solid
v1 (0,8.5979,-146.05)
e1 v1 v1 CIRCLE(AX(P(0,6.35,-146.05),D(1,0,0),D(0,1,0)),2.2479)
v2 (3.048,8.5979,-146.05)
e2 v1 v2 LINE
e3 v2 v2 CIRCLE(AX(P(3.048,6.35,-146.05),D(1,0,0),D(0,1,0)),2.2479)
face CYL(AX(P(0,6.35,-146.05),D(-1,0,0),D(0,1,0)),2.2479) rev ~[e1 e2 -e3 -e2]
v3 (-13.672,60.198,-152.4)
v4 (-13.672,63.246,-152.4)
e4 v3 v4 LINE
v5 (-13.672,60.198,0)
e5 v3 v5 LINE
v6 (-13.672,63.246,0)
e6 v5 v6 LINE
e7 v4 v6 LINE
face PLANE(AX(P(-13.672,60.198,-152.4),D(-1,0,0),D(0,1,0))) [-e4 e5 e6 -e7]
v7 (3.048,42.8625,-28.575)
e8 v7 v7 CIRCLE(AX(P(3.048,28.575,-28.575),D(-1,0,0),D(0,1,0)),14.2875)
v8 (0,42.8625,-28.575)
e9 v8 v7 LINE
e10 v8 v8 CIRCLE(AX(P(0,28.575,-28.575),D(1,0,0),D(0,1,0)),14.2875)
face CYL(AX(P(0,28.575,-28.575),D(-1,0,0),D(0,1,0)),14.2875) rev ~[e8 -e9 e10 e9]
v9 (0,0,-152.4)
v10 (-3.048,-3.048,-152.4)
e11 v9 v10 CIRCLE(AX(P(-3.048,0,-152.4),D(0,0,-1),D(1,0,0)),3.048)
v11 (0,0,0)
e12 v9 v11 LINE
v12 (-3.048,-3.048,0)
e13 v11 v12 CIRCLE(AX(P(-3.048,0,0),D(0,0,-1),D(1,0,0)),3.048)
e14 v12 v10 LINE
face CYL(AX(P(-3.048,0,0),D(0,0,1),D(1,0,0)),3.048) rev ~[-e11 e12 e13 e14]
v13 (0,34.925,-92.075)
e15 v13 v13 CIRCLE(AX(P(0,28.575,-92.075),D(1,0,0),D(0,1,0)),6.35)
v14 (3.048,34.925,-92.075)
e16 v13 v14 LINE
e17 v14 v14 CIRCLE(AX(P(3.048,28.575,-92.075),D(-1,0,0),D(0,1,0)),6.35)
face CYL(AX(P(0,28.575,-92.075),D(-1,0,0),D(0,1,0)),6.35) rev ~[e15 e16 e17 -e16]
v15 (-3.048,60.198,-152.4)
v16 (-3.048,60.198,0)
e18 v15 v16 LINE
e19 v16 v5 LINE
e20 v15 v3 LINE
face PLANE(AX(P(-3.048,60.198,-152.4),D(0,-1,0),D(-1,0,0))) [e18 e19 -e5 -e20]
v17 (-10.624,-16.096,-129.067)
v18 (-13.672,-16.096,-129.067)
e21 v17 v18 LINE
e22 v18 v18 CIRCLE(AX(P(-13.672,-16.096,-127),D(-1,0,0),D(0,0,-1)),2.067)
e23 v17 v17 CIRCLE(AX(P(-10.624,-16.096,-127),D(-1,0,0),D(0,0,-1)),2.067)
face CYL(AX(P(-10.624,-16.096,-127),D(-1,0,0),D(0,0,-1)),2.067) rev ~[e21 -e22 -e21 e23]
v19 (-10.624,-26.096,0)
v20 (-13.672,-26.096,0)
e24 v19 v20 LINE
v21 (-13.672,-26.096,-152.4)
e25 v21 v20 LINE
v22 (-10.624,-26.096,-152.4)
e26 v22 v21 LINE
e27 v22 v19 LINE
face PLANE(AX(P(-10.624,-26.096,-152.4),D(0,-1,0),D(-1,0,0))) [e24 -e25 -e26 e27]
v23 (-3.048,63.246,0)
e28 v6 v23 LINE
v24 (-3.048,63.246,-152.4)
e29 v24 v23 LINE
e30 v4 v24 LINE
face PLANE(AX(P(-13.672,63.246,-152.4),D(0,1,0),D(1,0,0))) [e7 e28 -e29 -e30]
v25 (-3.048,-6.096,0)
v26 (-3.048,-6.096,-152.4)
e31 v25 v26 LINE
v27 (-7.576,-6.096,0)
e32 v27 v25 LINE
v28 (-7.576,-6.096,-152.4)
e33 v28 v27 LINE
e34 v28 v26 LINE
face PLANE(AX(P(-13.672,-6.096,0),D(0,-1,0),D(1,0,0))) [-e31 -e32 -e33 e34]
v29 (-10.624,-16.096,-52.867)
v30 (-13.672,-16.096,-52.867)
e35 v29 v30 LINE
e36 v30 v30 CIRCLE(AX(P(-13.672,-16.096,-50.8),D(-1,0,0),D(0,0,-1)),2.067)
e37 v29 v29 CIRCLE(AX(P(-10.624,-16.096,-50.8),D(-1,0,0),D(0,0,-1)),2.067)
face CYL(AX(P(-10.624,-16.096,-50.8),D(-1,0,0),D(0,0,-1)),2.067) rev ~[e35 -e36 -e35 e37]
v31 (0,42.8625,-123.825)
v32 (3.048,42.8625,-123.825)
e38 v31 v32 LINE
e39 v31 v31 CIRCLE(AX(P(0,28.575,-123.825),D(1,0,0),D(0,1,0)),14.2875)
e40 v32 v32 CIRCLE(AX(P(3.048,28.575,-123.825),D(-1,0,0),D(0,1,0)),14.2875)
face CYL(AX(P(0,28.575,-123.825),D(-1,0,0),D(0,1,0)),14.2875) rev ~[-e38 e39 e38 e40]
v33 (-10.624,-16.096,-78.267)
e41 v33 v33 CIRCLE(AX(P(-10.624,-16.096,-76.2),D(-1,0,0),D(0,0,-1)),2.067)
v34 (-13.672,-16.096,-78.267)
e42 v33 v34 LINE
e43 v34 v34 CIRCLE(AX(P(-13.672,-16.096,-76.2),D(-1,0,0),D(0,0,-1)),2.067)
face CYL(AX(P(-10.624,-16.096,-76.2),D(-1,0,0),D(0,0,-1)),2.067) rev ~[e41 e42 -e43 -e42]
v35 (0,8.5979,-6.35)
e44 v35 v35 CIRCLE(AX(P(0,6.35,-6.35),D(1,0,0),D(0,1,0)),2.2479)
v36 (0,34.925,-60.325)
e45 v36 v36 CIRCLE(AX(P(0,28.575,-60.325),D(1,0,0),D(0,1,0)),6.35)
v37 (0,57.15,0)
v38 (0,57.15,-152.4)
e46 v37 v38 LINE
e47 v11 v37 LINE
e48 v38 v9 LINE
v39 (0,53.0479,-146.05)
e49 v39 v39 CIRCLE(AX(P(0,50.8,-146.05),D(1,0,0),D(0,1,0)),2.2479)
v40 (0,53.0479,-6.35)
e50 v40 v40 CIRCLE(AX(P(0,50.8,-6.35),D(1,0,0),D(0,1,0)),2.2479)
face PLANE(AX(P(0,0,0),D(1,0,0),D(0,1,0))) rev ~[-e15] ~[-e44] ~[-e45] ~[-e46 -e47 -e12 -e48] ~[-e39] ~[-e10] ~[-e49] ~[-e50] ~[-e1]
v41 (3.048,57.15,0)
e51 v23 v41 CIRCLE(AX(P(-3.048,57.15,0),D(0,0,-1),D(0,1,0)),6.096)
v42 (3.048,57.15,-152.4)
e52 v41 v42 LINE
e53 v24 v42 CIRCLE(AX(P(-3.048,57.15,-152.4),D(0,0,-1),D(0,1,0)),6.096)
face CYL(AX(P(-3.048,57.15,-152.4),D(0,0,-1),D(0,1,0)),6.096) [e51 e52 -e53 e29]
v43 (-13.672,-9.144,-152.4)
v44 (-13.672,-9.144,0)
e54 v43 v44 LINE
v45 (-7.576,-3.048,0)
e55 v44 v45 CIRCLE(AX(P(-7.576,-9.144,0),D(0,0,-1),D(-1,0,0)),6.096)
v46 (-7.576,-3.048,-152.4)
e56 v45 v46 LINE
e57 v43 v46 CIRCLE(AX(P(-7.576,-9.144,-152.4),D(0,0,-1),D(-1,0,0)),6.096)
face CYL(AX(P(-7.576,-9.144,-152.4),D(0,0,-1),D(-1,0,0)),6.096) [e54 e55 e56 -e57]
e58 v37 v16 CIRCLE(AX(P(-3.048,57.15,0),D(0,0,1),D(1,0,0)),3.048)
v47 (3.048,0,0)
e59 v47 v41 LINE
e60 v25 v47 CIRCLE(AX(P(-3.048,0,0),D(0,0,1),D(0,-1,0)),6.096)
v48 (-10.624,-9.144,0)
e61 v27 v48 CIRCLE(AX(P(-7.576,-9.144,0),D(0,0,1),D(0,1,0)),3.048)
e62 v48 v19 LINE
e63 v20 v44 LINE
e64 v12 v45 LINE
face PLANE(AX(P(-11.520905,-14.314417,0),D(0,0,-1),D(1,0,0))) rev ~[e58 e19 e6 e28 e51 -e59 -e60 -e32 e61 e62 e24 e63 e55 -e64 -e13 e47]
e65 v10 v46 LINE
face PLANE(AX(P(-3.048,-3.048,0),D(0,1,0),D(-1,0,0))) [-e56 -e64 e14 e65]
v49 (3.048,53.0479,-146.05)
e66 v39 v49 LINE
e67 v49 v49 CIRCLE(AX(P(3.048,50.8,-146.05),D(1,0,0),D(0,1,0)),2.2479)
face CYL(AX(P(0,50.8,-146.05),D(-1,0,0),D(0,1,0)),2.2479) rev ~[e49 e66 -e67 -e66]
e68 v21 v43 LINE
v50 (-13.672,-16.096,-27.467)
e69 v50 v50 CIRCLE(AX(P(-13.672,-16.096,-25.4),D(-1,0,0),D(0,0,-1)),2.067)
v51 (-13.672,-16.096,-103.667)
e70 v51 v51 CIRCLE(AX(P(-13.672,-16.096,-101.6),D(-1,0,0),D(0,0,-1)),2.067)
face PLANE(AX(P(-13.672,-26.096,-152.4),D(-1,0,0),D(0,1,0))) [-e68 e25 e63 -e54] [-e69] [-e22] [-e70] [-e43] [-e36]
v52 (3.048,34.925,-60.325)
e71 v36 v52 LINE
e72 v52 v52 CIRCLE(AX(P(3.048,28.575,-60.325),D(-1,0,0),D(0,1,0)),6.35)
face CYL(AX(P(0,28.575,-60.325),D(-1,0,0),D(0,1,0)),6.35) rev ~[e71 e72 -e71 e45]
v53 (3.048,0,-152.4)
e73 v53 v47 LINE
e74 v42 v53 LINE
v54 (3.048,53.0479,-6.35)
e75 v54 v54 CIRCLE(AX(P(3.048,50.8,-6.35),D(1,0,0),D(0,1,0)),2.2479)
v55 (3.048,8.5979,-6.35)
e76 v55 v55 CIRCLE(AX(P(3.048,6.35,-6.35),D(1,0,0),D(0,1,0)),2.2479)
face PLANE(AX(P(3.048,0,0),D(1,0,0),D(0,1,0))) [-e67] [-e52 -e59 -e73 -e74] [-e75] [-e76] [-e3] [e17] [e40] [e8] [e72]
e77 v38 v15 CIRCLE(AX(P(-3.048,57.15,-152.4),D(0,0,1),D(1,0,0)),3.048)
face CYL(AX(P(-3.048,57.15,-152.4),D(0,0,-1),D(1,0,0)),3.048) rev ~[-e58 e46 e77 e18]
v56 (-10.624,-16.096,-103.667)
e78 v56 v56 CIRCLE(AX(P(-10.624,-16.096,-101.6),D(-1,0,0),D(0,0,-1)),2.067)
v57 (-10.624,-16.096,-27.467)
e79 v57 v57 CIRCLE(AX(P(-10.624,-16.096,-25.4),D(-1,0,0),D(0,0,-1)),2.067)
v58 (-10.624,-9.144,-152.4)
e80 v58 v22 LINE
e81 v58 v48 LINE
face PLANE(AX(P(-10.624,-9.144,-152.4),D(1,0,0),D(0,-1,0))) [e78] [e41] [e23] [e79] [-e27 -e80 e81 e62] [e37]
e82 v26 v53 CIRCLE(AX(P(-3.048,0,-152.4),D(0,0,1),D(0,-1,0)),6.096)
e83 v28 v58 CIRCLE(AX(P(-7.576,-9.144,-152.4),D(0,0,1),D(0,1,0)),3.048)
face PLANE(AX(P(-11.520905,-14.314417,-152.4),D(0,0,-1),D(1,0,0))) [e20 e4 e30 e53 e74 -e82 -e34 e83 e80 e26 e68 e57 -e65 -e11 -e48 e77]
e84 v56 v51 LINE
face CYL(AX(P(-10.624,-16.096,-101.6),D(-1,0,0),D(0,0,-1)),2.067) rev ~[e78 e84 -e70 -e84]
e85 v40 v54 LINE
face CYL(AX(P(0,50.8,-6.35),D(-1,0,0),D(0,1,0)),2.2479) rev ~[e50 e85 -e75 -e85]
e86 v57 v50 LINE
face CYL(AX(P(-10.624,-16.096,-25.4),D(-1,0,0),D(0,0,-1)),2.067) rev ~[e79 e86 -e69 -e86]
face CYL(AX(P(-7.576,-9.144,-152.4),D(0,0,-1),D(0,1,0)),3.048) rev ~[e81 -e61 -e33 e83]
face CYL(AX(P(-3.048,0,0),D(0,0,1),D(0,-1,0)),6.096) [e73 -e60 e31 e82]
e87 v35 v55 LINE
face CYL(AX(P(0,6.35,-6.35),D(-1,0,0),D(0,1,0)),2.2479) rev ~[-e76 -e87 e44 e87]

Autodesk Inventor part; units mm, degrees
ref_plane "YZ Plane" through (0, 0, 0) normal (1, 0, 0) x (0, 1, 0)
ref_plane "XZ Plane" through (0, 0, 0) normal (0, 1, 0) x (-1, 0, 0)
ref_plane "XY Plane" through (0, 0, 0) normal (0, 0, 1) x (1, 0, 0)
sketch "Sketch3" plane through (-13.672, 63.246, 0) normal (0, 1, 0) x (1, 0, 0)
  line L0 (10.624, 0) -> (10.624, 152.4) projected
  line L1 (0, 152.4) -> (10.624, 152.4) projected
  line L2 (0, 0) -> (0, 152.4) projected
  line L3 (10.624, 0) -> (0, 0) projected
  point P0 (13.672, 0)
  point P1 (5.312, 127)
  point P2 (5.312, 152.4)
  point P3 (5.312, 101.6)
  point P4 (5.312, 76.2)
  point P5 (5.312, 50.8)
  point P6 (5.312, 25.4)
  dimension "d28" = 25.4
  dimension "d31" = 25.4
sketch "Sketch1" plane through (0, 0, 0) normal (1, 0, 0) x (0, 1, 0)
  line L0 (0, 0) -> (57.15, 0)
  line L1 (57.15, 0) -> (57.15, -152.4)
  line L2 (57.15, -152.4) -> (0, -152.4)
  line L3 (0, -152.4) -> (0, 0)
  circle A0 centre (28.575, -28.575) radius 14.2875
  circle A1 centre (28.575, -60.325) radius 6.35
  circle A2 centre (28.575, -92.075) radius 6.35
  circle A3 centre (28.575, -123.825) radius 14.2875
  circle A4 centre (50.8, -6.35) radius 2.2479
  circle A5 centre (50.8, -146.05) radius 2.2479
  circle A6 centre (6.35, -146.05) radius 2.2479
  circle A7 centre (6.35, -6.35) radius 2.2479
  line L4 (50.8, -6.35) -> (6.35, -6.35) construction
  line L5 (6.35, -6.35) -> (6.35, -146.05) construction
  line L6 (6.35, -146.05) -> (50.8, -146.05) construction
  line L7 (50.8, -146.05) -> (50.8, -6.35) construction
  line L8 (57.15, 0) -> (69.85, 0)
  line L9 (69.85, 0) -> (69.85, -152.4)
  line L10 (69.85, -152.4) -> (57.15, -152.4)
  line L11 (57.15, -152.4) -> (57.15, 0)
  line L12 (0, -152.4) -> (-12.7, -152.4)
  line L13 (-12.7, -152.4) -> (-12.7, 0)
  line L14 (-12.7, 0) -> (0, 0)
  line L15 (0, 0) -> (0, -152.4)
  line L16 (28.575, -123.825) -> (28.575, -28.575)
  point P0 (28.575, -152.4)
  point P1 (28.575, -6.35)
  point P2 (28.575, 0)
  point P3 (50.8, -76.2)
  point P4 (57.15, -76.2)
  point P5 (57.15, -76.2)
  point P6 (28.575, -76.2)
  dimension "d0" = 57.15
  dimension "d1" = 152.4
  dimension "d2" = 31.75
  dimension "d3" = 31.75
  dimension "d4" = 31.75
  dimension "d6" = 28.575
  dimension "d7" = 12.7
  dimension "d8" = 28.575
  dimension "d11" = 4.4958
  dimension "d12" = 139.7
  dimension "d13" = 44.45
  dimension "d14" = 12.7
  dimension "d15" = 152.4
  dimension "d16" = 12.7
  dimension "d17" = 152.4
extrude "Plate2" add sketch "Sketch1" along normal blind 3.048 contours L0 L1 L2 L3
sketch "Sketch2" plane through (-3.048, 60.198, -152.4) normal (0, 1, 0) x (-1, 0, 0)
  line L0 (0, 152.4) -> (0, 0)
  line L1 (0, 0) -> (10.624, 0)
  line L2 (10.624, 0) -> (10.624, 152.4)
  line L3 (10.624, 152.4) -> (0, 152.4)
edge flange "Flange1" height 16.72 angle 90 thickness 3.048 bend radius 3.048 thickness toward (0, 1, 0) relief tear relief width 3.048 relief depth 1.524 corner gap 3.048 corner form 0 edges at (0, 57.15, -76.2) (0, 0, -76.2) wall of the first edge with corners at (-3.048, 60.198, 0) (-3.048, 60.198, -152.4) (-13.672, 60.198, -152.4) (-13.672, 60.198, 0)
bend "Bend1"
corner "Corner1"
sketch "Sketch4" plane through (-10.624, -3.048, -152.4) normal (-1, 0, 0) x (0, -1, 0)
  line L0 (0, 152.4) -> (0, 0)
  line L1 (0, 0) -> (23.048, 0)
  line L2 (23.048, 0) -> (23.048, 152.4)
  line L3 (23.048, 152.4) -> (0, 152.4)
edge flange "Flange2" height 20 angle 90 thickness 3.048 bend radius 3.048 thickness toward (-1, 0, 0) relief tear relief width 3.048 relief depth 1.524 edges at (-13.672, -6.096, -76.2) wall of the first edge with corners at (-10.624, -3.048, 0) (-10.624, -3.048, -152.4) (-10.624, -26.096, -152.4) (-10.624, -26.096, 0)
bend "Bend2"
corner "Corner2"
sketch "Sketch5" plane through (-10.624, -26.096, 0) normal (1, 0, 0) x (0, 0, -1)
  line L0 (152.4, 16.952) -> (152.4, 0) projected
  line L1 (0, 0) -> (152.4, 0) projected
  point P0 (0, 26.096)
  point P1 (127, 10)
  point P2 (101.6, 10)
  point P3 (76.2, 10)
  point P4 (50.8, 10)
  point P5 (25.4, 10)
  dimension "d53" = 25.4
  dimension "d54" = 10
  dimension "d57" = 25.4
hole "Hole2" at (-10.624, -16.096, -127) at (-10.624, -16.096, -101.6) at (-10.624, -16.096, -76.2) at (-10.624, -16.096, -50.8) at (-10.624, -16.096, -25.4) direction (-1, 0, 0) diameter 4.134 end through all
equation "\"d10\" = Thickness"
equation "\"d18\" = BendReliefWidth"
equation "\"d19\" = BendReliefDepth"
equation "\"d20\" = MinimumRemnant"
equation "\"d21\" = TransitionRadius"
equation "\"d24\" = BendRadius"
equation "\"d25\" = CornerReliefSize"
equation "\"d26\" = GapSize"
equation "\"d27\" = JacobiRadiusSize"
equation "\"d43\" = BendReliefWidth"
equation "\"d44\" = BendReliefDepth"
equation "\"d45\" = MinimumRemnant"
equation "\"d46\" = TransitionRadius"
equation "\"d49\" = BendRadius"
equation "\"d50\" = CornerReliefSize"
equation "\"d51\" = GapSize"
equation "\"d52\" = JacobiRadiusSize"
equation "\"BendRadius\" = Thickness"
equation "\"BendReliefWidth\" = Thickness"
equation "\"BendReliefDepth\" = 0.5 * Thickness"
equation "\"CornerReliefSize\" = 4 * Thickness"
equation "\"MinimumRemnant\" = 2 * Thickness"
equation "\"TransitionRadius\" = BendRadius"
equation "\"JacobiRadiusSize\" = BendRadius"
equation "\"GapSize\" = Thickness"
equation "\"Thickness\" = 3.048"
properties part number "CH-1-01-GearboxHousingMotorSide" material "Steel, Alloy"
